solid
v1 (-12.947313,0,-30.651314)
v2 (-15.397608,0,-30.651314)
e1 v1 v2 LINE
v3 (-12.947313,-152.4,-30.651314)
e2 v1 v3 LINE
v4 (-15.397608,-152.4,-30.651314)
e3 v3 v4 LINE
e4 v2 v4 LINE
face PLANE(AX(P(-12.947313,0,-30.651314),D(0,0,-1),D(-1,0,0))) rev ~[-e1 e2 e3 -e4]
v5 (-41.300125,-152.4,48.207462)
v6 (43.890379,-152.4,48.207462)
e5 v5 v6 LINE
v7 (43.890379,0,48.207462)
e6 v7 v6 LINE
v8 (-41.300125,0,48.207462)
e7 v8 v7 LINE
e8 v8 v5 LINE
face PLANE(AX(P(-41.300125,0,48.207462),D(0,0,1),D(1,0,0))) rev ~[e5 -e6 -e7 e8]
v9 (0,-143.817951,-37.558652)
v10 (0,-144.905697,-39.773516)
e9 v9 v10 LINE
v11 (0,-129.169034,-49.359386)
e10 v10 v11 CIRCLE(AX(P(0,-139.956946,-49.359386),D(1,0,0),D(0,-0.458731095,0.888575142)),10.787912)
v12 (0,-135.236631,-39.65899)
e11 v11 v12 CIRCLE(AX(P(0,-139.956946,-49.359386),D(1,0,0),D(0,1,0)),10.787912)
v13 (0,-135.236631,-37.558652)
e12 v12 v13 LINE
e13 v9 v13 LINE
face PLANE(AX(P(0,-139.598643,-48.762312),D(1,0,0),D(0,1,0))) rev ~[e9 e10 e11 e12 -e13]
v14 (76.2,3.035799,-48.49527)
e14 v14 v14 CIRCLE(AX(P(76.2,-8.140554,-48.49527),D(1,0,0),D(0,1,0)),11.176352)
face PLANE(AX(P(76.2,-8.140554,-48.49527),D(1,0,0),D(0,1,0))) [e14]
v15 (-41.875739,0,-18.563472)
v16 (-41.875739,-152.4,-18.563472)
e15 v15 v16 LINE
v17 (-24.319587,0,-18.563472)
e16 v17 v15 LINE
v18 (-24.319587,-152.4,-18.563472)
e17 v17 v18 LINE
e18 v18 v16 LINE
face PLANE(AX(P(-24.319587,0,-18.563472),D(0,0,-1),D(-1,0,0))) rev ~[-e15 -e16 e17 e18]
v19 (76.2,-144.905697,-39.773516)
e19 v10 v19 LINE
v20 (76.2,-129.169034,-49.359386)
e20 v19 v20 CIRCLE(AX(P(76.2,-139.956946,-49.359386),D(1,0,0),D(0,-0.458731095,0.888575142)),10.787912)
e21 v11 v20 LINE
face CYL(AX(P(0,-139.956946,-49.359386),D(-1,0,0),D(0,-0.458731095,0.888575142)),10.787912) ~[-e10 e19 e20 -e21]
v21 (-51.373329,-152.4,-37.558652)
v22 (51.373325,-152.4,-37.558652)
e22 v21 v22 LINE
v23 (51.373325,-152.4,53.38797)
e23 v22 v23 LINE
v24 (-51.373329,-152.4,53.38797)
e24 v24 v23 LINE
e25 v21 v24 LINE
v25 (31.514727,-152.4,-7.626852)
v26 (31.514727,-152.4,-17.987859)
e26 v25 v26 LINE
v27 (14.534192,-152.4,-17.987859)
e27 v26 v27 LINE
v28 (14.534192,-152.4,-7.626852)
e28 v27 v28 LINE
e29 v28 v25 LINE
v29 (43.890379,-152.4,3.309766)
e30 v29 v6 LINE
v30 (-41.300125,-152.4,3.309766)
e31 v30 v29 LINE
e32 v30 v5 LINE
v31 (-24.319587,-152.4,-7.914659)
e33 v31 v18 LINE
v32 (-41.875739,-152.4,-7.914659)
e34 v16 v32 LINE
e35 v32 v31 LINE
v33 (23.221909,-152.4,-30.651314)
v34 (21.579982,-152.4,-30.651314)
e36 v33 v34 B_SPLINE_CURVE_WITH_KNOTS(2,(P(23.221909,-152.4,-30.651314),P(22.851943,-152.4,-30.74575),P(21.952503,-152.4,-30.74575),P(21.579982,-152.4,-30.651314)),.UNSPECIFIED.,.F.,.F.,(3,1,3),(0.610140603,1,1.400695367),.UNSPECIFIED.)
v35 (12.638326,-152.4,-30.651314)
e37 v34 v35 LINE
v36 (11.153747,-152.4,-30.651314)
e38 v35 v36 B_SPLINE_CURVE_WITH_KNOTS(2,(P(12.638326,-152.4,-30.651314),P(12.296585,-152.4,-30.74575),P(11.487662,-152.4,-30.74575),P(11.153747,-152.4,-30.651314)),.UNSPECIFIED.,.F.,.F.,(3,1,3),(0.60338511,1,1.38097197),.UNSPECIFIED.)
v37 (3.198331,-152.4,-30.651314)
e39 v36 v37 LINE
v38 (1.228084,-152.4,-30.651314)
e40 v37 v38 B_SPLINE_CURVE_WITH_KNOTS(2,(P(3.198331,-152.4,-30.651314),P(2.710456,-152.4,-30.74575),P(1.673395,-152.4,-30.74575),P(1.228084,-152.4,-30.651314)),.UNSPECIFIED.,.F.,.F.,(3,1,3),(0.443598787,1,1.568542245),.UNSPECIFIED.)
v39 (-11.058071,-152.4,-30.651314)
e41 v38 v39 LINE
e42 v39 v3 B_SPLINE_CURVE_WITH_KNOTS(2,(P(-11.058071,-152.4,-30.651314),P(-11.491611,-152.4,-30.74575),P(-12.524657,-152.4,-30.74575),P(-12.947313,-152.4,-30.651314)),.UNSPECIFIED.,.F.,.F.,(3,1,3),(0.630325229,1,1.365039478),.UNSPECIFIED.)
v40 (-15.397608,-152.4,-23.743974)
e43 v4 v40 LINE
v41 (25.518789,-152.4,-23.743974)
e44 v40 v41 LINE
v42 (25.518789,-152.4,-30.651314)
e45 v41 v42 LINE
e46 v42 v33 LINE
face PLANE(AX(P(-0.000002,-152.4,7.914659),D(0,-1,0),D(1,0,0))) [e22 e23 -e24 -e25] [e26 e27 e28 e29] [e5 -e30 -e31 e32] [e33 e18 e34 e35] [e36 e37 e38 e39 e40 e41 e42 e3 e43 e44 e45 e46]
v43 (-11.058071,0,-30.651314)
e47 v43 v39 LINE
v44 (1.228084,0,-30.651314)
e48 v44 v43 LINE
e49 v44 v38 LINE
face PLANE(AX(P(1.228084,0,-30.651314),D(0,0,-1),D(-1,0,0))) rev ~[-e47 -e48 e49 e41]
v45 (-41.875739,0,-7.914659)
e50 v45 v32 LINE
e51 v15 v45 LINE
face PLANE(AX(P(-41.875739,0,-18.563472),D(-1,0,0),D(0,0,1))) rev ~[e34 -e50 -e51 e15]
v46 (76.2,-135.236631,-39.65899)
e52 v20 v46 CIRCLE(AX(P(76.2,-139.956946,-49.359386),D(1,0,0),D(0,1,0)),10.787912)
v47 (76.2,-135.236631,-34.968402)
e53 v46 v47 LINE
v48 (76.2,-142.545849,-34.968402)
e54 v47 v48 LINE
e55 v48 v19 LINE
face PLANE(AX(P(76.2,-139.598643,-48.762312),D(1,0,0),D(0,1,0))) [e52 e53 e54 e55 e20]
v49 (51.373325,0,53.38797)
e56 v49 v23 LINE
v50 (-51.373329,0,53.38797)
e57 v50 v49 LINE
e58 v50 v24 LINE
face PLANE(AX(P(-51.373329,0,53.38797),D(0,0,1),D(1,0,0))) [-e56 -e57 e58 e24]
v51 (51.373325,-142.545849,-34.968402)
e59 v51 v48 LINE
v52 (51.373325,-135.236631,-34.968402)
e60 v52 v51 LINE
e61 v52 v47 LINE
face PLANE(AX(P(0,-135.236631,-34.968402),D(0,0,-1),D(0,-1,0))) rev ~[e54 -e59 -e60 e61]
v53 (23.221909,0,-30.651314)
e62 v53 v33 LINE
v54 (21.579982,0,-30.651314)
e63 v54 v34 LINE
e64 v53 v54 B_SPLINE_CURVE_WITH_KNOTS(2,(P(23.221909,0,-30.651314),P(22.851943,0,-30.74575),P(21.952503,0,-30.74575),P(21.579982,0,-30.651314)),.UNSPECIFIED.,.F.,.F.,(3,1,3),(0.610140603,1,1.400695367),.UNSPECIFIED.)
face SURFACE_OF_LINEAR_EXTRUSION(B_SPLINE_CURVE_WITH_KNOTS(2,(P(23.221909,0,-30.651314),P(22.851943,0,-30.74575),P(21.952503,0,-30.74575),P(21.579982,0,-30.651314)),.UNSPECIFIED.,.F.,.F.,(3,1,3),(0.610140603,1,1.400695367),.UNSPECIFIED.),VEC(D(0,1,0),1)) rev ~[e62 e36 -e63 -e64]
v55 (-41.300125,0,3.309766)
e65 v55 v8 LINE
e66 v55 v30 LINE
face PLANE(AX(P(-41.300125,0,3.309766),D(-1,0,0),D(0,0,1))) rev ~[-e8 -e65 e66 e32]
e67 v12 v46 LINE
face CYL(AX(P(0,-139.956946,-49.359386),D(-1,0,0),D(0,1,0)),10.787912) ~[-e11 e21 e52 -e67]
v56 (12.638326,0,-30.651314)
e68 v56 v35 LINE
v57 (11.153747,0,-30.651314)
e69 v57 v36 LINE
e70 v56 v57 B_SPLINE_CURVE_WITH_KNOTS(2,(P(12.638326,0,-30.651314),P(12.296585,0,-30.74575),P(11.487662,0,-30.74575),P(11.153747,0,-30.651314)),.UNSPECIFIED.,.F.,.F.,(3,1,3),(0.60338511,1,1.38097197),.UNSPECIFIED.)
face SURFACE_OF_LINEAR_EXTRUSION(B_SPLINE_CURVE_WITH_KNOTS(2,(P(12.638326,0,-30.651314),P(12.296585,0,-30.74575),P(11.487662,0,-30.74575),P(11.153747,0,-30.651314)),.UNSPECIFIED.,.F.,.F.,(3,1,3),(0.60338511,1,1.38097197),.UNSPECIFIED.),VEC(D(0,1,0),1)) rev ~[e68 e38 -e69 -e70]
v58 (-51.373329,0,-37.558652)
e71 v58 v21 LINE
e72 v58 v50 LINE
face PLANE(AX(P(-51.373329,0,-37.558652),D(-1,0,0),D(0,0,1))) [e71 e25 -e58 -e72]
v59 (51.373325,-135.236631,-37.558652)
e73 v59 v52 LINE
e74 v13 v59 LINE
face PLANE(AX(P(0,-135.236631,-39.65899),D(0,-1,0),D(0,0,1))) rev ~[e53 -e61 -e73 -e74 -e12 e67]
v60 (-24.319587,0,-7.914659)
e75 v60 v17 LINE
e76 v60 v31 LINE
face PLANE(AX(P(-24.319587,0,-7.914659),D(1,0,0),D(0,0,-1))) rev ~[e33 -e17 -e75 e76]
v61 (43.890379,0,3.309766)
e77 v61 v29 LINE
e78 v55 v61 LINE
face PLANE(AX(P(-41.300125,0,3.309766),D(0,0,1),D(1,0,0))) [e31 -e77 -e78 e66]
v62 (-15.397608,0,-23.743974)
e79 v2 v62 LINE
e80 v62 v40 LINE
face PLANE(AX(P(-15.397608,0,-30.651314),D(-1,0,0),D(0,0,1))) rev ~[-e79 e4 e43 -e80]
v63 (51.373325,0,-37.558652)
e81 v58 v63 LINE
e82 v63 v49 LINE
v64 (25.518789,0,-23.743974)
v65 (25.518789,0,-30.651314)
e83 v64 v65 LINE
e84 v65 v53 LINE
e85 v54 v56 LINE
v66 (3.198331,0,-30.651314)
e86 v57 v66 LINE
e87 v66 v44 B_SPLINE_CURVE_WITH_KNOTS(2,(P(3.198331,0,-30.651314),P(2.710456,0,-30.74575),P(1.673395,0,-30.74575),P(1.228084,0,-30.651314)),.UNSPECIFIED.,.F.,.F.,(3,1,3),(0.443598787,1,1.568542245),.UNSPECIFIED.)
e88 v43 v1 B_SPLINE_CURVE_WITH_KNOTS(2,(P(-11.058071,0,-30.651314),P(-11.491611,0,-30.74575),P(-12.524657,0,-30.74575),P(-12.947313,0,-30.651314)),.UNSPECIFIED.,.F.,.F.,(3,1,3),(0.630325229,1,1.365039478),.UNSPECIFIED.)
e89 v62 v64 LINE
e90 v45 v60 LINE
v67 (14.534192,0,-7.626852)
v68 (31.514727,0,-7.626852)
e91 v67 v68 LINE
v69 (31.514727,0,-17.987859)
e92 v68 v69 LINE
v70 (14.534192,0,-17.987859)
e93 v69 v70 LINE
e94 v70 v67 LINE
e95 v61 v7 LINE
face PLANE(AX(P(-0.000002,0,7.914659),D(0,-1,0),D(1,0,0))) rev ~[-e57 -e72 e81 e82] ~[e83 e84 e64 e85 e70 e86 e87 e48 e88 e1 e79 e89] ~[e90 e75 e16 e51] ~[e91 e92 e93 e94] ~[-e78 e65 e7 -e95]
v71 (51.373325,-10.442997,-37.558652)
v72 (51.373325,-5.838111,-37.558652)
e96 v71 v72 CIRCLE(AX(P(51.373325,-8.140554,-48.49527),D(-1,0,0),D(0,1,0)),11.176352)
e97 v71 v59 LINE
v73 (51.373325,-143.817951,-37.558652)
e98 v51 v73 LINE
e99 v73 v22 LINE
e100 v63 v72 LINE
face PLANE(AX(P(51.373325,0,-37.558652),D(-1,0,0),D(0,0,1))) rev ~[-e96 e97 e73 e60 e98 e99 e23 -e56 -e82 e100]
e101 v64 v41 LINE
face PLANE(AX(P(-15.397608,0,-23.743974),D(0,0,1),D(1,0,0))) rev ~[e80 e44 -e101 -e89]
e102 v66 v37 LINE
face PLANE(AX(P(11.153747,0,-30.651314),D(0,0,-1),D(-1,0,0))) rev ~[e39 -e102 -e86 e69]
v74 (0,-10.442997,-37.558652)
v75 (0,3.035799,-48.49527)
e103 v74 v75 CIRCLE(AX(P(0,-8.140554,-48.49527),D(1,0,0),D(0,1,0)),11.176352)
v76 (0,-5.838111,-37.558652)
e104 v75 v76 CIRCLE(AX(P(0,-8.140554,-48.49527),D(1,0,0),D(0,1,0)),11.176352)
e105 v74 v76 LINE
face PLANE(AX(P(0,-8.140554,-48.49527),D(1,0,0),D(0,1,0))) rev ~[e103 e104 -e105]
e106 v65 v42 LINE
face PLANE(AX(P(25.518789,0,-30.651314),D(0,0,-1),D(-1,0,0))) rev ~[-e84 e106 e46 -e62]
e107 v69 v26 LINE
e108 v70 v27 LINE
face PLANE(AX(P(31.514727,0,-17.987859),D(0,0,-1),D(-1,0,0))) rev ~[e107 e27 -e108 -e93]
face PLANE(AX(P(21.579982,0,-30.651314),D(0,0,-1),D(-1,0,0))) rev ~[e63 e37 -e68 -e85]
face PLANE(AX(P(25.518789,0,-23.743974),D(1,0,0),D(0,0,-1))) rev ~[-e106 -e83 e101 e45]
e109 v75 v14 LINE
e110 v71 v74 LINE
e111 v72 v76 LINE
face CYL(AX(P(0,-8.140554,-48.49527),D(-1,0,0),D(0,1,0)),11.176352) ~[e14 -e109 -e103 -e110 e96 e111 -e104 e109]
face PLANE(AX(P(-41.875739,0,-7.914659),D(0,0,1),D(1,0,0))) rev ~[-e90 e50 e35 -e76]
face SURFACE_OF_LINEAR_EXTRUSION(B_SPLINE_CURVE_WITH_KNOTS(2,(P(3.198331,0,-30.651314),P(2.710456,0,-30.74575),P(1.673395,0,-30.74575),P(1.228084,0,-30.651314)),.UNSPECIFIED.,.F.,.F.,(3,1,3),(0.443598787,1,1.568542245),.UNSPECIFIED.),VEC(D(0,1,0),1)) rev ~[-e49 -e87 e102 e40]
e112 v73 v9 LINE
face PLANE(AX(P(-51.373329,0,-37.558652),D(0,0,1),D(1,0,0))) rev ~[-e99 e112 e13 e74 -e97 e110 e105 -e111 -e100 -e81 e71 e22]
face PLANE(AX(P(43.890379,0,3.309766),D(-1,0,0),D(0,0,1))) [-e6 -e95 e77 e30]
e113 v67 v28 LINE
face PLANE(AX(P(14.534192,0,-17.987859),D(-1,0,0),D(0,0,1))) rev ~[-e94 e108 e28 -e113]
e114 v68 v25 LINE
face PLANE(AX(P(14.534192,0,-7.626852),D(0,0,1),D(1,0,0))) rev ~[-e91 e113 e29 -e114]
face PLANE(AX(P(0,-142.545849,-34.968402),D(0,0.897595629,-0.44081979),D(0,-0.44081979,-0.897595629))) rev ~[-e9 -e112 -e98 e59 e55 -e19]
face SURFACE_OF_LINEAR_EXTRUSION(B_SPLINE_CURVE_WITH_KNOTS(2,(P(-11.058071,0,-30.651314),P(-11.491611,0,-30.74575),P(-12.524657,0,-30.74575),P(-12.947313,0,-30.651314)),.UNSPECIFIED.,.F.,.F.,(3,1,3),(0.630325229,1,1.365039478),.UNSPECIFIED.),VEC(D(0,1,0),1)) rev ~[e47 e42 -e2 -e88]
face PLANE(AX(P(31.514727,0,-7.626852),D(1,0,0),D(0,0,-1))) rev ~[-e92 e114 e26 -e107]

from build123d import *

# Parameters (mm, degrees)
F0_W     = 102.7466543019
F0_H     = 90.9466221929
F0_W_2   = 85.1905047894
F0_H_2   = 44.8976957705
F1_DEPTH = 152.4
F2_R     = 11.1763524663
F3_DEPTH = 76.2


with BuildPart() as f1:
    # F0 (on Front) → F1 (new body)
    with BuildSketch(Plane.XZ):
        with Locations((-1.8626e-06, 7.9146586359)):
            Rectangle(F0_W, F0_H)
        Polygon((-41.8757386506, -12.8073554952), (-41.8757386506, -7.9146586359), (-37.270847708, -7.9146586359), (-24.3195872754, -7.9146586359), (-24.3195872754, -18.5634717345), (-37.270847708, -18.5634717345), (-41.8757386506, -18.5634717345), align=None, mode=Mode.SUBTRACT)
        with BuildLine():
            Line((-15.3976082802, -30.6513141841), (-15.3976082802, -23.7439740449))
            Line((-15.3976082802, -23.7439740449), (25.5187885163, -23.7439740449))
            Line((25.5187885163, -23.7439740449), (25.5187885163, -30.6513141841))
            Line((25.5187885163, -30.6513141841), (23.2219085714, -30.6513141841))
            add(Edge.make_bspline(
                [(23.2219085714, -30.6513141841), (22.85194256, -30.745750475), (22.4083868695, -30.745750475)],
                knots=[0.6101406025, 0.6101406025, 0.6101406025, 1, 1, 1], degree=2))
            add(Edge.make_bspline(
                [(22.4083868695, -30.745750475), (21.9525027452, -30.745750475), (21.5799819799, -30.6513141841)],
                knots=[0, 0, 0, 0.4594075276, 0.4594075276, 0.4594075276], degree=2))
            Line((21.5799819799, -30.6513141841), (17.1949040127, -30.6513141841))
            Line((17.1949040127, -30.6513141841), (15.8233293106, -30.6513141841))
            Line((15.8233293106, -30.6513141841), (12.6383256981, -30.6513141841))
            add(Edge.make_bspline(
                [(12.6383256981, -30.6513141841), (12.2965846392, -30.745750475), (11.8839868875, -30.745750475)],
                knots=[0.6033851102, 0.6033851102, 0.6033851102, 1, 1, 1], degree=2))
            add(Edge.make_bspline(
                [(11.8839868875, -30.745750475), (11.4876624367, -30.745750475), (11.1537473039, -30.6513141841)],
                knots=[0, 0, 0, 0.3398387497, 0.3398387497, 0.3398387497], degree=2))
            Line((11.1537473039, -30.6513141841), (3.1983305145, -30.6513141841))
            add(Edge.make_bspline(
                [(3.1983305145, -30.6513141841), (2.7104556951, -30.745750475), (2.1975216142, -30.745750475)],
                knots=[0.4435987872, 0.4435987872, 0.4435987872, 1, 1, 1], degree=2))
            add(Edge.make_bspline(
                [(2.1975216142, -30.745750475), (1.6733949816, -30.745750475), (1.2280841955, -30.6513141841)],
                knots=[0, 0, 0, 0.325259052, 0.325259052, 0.325259052], degree=2))
            Line((1.2280841955, -30.6513141841), (-2.1870204663, -30.6513141841))
            Line((-2.1870204663, -30.6513141841), (-3.5690880896, -30.6513141841))
            Line((-3.5690880896, -30.6513141841), (-6.4456474922, -30.6513141841))
            Line((-6.4456474922, -30.6513141841), (-7.8277151155, -30.6513141841))
            Line((-7.8277151155, -30.6513141841), (-11.0580714674, -30.6513141841))
            add(Edge.make_bspline(
                [(-11.0580714674, -30.6513141841), (-11.4916109594, -30.745750475), (-12.0113927042, -30.745750475)],
                knots=[0.6303252294, 0.6303252294, 0.6303252294, 1, 1, 1], degree=2))
            add(Edge.make_bspline(
                [(-12.0113927042, -30.745750475), (-12.5246569888, -30.745750475), (-12.9473134807, -30.6513141841)],
                knots=[0, 0, 0, 0.3766854018, 0.3766854018, 0.3766854018], degree=2))
            Line((-12.9473134807, -30.6513141841), (-15.3976082802, -30.6513141841))
        make_face(mode=Mode.SUBTRACT)
        Polygon((14.5341921598, -17.9878585041), (14.5341921598, -7.6268524863), (26.0464195162, -7.6268524863), (31.5147265792, -7.6268524863), (31.5147265792, -12.8073554952), (31.5147265792, -17.9878585041), (26.0464195162, -17.9878585041), align=None, mode=Mode.SUBTRACT)
        with Locations((1.2951269746, 25.7586139487)):
            Rectangle(F0_W_2, F0_H_2, mode=Mode.SUBTRACT)
    extrude(amount=F1_DEPTH)

    # F2 (on Right) → F3 (join)
    with BuildSketch(Plane.YZ):
        with Locations((-8.1405537203, -48.4952703118)):
            Circle(F2_R)
        with BuildLine():
            ThreePointArc((-144.905696857, -39.7735155561), (-145.56909186, -58.572575633), (-129.1690343005, -49.3593859167))
            ThreePointArc((-129.1690343005, -49.3593859167), (-130.8108710033, -43.6385160791), (-135.2366314328, -39.6589904693))
            ThreePointArc((-135.2366314328, -39.6589904693), (-140.084714499, -38.57223065), (-144.905696857, -39.7735155561))
        make_face()
        with BuildLine():
            ThreePointArc((-144.905696857, -39.7735155561), (-140.084714499, -38.57223065), (-135.2366314328, -39.6589904693))
            Line((-135.2366314328, -39.6589904693), (-135.2366314328, -34.9684022367))
            Line((-135.2366314328, -34.9684022367), (-142.5458490849, -34.9684022367))
            Line((-142.5458490849, -34.9684022367), (-144.905696857, -39.7735155561))
        make_face()
    extrude(amount=F3_DEPTH)


solid = f1.part
